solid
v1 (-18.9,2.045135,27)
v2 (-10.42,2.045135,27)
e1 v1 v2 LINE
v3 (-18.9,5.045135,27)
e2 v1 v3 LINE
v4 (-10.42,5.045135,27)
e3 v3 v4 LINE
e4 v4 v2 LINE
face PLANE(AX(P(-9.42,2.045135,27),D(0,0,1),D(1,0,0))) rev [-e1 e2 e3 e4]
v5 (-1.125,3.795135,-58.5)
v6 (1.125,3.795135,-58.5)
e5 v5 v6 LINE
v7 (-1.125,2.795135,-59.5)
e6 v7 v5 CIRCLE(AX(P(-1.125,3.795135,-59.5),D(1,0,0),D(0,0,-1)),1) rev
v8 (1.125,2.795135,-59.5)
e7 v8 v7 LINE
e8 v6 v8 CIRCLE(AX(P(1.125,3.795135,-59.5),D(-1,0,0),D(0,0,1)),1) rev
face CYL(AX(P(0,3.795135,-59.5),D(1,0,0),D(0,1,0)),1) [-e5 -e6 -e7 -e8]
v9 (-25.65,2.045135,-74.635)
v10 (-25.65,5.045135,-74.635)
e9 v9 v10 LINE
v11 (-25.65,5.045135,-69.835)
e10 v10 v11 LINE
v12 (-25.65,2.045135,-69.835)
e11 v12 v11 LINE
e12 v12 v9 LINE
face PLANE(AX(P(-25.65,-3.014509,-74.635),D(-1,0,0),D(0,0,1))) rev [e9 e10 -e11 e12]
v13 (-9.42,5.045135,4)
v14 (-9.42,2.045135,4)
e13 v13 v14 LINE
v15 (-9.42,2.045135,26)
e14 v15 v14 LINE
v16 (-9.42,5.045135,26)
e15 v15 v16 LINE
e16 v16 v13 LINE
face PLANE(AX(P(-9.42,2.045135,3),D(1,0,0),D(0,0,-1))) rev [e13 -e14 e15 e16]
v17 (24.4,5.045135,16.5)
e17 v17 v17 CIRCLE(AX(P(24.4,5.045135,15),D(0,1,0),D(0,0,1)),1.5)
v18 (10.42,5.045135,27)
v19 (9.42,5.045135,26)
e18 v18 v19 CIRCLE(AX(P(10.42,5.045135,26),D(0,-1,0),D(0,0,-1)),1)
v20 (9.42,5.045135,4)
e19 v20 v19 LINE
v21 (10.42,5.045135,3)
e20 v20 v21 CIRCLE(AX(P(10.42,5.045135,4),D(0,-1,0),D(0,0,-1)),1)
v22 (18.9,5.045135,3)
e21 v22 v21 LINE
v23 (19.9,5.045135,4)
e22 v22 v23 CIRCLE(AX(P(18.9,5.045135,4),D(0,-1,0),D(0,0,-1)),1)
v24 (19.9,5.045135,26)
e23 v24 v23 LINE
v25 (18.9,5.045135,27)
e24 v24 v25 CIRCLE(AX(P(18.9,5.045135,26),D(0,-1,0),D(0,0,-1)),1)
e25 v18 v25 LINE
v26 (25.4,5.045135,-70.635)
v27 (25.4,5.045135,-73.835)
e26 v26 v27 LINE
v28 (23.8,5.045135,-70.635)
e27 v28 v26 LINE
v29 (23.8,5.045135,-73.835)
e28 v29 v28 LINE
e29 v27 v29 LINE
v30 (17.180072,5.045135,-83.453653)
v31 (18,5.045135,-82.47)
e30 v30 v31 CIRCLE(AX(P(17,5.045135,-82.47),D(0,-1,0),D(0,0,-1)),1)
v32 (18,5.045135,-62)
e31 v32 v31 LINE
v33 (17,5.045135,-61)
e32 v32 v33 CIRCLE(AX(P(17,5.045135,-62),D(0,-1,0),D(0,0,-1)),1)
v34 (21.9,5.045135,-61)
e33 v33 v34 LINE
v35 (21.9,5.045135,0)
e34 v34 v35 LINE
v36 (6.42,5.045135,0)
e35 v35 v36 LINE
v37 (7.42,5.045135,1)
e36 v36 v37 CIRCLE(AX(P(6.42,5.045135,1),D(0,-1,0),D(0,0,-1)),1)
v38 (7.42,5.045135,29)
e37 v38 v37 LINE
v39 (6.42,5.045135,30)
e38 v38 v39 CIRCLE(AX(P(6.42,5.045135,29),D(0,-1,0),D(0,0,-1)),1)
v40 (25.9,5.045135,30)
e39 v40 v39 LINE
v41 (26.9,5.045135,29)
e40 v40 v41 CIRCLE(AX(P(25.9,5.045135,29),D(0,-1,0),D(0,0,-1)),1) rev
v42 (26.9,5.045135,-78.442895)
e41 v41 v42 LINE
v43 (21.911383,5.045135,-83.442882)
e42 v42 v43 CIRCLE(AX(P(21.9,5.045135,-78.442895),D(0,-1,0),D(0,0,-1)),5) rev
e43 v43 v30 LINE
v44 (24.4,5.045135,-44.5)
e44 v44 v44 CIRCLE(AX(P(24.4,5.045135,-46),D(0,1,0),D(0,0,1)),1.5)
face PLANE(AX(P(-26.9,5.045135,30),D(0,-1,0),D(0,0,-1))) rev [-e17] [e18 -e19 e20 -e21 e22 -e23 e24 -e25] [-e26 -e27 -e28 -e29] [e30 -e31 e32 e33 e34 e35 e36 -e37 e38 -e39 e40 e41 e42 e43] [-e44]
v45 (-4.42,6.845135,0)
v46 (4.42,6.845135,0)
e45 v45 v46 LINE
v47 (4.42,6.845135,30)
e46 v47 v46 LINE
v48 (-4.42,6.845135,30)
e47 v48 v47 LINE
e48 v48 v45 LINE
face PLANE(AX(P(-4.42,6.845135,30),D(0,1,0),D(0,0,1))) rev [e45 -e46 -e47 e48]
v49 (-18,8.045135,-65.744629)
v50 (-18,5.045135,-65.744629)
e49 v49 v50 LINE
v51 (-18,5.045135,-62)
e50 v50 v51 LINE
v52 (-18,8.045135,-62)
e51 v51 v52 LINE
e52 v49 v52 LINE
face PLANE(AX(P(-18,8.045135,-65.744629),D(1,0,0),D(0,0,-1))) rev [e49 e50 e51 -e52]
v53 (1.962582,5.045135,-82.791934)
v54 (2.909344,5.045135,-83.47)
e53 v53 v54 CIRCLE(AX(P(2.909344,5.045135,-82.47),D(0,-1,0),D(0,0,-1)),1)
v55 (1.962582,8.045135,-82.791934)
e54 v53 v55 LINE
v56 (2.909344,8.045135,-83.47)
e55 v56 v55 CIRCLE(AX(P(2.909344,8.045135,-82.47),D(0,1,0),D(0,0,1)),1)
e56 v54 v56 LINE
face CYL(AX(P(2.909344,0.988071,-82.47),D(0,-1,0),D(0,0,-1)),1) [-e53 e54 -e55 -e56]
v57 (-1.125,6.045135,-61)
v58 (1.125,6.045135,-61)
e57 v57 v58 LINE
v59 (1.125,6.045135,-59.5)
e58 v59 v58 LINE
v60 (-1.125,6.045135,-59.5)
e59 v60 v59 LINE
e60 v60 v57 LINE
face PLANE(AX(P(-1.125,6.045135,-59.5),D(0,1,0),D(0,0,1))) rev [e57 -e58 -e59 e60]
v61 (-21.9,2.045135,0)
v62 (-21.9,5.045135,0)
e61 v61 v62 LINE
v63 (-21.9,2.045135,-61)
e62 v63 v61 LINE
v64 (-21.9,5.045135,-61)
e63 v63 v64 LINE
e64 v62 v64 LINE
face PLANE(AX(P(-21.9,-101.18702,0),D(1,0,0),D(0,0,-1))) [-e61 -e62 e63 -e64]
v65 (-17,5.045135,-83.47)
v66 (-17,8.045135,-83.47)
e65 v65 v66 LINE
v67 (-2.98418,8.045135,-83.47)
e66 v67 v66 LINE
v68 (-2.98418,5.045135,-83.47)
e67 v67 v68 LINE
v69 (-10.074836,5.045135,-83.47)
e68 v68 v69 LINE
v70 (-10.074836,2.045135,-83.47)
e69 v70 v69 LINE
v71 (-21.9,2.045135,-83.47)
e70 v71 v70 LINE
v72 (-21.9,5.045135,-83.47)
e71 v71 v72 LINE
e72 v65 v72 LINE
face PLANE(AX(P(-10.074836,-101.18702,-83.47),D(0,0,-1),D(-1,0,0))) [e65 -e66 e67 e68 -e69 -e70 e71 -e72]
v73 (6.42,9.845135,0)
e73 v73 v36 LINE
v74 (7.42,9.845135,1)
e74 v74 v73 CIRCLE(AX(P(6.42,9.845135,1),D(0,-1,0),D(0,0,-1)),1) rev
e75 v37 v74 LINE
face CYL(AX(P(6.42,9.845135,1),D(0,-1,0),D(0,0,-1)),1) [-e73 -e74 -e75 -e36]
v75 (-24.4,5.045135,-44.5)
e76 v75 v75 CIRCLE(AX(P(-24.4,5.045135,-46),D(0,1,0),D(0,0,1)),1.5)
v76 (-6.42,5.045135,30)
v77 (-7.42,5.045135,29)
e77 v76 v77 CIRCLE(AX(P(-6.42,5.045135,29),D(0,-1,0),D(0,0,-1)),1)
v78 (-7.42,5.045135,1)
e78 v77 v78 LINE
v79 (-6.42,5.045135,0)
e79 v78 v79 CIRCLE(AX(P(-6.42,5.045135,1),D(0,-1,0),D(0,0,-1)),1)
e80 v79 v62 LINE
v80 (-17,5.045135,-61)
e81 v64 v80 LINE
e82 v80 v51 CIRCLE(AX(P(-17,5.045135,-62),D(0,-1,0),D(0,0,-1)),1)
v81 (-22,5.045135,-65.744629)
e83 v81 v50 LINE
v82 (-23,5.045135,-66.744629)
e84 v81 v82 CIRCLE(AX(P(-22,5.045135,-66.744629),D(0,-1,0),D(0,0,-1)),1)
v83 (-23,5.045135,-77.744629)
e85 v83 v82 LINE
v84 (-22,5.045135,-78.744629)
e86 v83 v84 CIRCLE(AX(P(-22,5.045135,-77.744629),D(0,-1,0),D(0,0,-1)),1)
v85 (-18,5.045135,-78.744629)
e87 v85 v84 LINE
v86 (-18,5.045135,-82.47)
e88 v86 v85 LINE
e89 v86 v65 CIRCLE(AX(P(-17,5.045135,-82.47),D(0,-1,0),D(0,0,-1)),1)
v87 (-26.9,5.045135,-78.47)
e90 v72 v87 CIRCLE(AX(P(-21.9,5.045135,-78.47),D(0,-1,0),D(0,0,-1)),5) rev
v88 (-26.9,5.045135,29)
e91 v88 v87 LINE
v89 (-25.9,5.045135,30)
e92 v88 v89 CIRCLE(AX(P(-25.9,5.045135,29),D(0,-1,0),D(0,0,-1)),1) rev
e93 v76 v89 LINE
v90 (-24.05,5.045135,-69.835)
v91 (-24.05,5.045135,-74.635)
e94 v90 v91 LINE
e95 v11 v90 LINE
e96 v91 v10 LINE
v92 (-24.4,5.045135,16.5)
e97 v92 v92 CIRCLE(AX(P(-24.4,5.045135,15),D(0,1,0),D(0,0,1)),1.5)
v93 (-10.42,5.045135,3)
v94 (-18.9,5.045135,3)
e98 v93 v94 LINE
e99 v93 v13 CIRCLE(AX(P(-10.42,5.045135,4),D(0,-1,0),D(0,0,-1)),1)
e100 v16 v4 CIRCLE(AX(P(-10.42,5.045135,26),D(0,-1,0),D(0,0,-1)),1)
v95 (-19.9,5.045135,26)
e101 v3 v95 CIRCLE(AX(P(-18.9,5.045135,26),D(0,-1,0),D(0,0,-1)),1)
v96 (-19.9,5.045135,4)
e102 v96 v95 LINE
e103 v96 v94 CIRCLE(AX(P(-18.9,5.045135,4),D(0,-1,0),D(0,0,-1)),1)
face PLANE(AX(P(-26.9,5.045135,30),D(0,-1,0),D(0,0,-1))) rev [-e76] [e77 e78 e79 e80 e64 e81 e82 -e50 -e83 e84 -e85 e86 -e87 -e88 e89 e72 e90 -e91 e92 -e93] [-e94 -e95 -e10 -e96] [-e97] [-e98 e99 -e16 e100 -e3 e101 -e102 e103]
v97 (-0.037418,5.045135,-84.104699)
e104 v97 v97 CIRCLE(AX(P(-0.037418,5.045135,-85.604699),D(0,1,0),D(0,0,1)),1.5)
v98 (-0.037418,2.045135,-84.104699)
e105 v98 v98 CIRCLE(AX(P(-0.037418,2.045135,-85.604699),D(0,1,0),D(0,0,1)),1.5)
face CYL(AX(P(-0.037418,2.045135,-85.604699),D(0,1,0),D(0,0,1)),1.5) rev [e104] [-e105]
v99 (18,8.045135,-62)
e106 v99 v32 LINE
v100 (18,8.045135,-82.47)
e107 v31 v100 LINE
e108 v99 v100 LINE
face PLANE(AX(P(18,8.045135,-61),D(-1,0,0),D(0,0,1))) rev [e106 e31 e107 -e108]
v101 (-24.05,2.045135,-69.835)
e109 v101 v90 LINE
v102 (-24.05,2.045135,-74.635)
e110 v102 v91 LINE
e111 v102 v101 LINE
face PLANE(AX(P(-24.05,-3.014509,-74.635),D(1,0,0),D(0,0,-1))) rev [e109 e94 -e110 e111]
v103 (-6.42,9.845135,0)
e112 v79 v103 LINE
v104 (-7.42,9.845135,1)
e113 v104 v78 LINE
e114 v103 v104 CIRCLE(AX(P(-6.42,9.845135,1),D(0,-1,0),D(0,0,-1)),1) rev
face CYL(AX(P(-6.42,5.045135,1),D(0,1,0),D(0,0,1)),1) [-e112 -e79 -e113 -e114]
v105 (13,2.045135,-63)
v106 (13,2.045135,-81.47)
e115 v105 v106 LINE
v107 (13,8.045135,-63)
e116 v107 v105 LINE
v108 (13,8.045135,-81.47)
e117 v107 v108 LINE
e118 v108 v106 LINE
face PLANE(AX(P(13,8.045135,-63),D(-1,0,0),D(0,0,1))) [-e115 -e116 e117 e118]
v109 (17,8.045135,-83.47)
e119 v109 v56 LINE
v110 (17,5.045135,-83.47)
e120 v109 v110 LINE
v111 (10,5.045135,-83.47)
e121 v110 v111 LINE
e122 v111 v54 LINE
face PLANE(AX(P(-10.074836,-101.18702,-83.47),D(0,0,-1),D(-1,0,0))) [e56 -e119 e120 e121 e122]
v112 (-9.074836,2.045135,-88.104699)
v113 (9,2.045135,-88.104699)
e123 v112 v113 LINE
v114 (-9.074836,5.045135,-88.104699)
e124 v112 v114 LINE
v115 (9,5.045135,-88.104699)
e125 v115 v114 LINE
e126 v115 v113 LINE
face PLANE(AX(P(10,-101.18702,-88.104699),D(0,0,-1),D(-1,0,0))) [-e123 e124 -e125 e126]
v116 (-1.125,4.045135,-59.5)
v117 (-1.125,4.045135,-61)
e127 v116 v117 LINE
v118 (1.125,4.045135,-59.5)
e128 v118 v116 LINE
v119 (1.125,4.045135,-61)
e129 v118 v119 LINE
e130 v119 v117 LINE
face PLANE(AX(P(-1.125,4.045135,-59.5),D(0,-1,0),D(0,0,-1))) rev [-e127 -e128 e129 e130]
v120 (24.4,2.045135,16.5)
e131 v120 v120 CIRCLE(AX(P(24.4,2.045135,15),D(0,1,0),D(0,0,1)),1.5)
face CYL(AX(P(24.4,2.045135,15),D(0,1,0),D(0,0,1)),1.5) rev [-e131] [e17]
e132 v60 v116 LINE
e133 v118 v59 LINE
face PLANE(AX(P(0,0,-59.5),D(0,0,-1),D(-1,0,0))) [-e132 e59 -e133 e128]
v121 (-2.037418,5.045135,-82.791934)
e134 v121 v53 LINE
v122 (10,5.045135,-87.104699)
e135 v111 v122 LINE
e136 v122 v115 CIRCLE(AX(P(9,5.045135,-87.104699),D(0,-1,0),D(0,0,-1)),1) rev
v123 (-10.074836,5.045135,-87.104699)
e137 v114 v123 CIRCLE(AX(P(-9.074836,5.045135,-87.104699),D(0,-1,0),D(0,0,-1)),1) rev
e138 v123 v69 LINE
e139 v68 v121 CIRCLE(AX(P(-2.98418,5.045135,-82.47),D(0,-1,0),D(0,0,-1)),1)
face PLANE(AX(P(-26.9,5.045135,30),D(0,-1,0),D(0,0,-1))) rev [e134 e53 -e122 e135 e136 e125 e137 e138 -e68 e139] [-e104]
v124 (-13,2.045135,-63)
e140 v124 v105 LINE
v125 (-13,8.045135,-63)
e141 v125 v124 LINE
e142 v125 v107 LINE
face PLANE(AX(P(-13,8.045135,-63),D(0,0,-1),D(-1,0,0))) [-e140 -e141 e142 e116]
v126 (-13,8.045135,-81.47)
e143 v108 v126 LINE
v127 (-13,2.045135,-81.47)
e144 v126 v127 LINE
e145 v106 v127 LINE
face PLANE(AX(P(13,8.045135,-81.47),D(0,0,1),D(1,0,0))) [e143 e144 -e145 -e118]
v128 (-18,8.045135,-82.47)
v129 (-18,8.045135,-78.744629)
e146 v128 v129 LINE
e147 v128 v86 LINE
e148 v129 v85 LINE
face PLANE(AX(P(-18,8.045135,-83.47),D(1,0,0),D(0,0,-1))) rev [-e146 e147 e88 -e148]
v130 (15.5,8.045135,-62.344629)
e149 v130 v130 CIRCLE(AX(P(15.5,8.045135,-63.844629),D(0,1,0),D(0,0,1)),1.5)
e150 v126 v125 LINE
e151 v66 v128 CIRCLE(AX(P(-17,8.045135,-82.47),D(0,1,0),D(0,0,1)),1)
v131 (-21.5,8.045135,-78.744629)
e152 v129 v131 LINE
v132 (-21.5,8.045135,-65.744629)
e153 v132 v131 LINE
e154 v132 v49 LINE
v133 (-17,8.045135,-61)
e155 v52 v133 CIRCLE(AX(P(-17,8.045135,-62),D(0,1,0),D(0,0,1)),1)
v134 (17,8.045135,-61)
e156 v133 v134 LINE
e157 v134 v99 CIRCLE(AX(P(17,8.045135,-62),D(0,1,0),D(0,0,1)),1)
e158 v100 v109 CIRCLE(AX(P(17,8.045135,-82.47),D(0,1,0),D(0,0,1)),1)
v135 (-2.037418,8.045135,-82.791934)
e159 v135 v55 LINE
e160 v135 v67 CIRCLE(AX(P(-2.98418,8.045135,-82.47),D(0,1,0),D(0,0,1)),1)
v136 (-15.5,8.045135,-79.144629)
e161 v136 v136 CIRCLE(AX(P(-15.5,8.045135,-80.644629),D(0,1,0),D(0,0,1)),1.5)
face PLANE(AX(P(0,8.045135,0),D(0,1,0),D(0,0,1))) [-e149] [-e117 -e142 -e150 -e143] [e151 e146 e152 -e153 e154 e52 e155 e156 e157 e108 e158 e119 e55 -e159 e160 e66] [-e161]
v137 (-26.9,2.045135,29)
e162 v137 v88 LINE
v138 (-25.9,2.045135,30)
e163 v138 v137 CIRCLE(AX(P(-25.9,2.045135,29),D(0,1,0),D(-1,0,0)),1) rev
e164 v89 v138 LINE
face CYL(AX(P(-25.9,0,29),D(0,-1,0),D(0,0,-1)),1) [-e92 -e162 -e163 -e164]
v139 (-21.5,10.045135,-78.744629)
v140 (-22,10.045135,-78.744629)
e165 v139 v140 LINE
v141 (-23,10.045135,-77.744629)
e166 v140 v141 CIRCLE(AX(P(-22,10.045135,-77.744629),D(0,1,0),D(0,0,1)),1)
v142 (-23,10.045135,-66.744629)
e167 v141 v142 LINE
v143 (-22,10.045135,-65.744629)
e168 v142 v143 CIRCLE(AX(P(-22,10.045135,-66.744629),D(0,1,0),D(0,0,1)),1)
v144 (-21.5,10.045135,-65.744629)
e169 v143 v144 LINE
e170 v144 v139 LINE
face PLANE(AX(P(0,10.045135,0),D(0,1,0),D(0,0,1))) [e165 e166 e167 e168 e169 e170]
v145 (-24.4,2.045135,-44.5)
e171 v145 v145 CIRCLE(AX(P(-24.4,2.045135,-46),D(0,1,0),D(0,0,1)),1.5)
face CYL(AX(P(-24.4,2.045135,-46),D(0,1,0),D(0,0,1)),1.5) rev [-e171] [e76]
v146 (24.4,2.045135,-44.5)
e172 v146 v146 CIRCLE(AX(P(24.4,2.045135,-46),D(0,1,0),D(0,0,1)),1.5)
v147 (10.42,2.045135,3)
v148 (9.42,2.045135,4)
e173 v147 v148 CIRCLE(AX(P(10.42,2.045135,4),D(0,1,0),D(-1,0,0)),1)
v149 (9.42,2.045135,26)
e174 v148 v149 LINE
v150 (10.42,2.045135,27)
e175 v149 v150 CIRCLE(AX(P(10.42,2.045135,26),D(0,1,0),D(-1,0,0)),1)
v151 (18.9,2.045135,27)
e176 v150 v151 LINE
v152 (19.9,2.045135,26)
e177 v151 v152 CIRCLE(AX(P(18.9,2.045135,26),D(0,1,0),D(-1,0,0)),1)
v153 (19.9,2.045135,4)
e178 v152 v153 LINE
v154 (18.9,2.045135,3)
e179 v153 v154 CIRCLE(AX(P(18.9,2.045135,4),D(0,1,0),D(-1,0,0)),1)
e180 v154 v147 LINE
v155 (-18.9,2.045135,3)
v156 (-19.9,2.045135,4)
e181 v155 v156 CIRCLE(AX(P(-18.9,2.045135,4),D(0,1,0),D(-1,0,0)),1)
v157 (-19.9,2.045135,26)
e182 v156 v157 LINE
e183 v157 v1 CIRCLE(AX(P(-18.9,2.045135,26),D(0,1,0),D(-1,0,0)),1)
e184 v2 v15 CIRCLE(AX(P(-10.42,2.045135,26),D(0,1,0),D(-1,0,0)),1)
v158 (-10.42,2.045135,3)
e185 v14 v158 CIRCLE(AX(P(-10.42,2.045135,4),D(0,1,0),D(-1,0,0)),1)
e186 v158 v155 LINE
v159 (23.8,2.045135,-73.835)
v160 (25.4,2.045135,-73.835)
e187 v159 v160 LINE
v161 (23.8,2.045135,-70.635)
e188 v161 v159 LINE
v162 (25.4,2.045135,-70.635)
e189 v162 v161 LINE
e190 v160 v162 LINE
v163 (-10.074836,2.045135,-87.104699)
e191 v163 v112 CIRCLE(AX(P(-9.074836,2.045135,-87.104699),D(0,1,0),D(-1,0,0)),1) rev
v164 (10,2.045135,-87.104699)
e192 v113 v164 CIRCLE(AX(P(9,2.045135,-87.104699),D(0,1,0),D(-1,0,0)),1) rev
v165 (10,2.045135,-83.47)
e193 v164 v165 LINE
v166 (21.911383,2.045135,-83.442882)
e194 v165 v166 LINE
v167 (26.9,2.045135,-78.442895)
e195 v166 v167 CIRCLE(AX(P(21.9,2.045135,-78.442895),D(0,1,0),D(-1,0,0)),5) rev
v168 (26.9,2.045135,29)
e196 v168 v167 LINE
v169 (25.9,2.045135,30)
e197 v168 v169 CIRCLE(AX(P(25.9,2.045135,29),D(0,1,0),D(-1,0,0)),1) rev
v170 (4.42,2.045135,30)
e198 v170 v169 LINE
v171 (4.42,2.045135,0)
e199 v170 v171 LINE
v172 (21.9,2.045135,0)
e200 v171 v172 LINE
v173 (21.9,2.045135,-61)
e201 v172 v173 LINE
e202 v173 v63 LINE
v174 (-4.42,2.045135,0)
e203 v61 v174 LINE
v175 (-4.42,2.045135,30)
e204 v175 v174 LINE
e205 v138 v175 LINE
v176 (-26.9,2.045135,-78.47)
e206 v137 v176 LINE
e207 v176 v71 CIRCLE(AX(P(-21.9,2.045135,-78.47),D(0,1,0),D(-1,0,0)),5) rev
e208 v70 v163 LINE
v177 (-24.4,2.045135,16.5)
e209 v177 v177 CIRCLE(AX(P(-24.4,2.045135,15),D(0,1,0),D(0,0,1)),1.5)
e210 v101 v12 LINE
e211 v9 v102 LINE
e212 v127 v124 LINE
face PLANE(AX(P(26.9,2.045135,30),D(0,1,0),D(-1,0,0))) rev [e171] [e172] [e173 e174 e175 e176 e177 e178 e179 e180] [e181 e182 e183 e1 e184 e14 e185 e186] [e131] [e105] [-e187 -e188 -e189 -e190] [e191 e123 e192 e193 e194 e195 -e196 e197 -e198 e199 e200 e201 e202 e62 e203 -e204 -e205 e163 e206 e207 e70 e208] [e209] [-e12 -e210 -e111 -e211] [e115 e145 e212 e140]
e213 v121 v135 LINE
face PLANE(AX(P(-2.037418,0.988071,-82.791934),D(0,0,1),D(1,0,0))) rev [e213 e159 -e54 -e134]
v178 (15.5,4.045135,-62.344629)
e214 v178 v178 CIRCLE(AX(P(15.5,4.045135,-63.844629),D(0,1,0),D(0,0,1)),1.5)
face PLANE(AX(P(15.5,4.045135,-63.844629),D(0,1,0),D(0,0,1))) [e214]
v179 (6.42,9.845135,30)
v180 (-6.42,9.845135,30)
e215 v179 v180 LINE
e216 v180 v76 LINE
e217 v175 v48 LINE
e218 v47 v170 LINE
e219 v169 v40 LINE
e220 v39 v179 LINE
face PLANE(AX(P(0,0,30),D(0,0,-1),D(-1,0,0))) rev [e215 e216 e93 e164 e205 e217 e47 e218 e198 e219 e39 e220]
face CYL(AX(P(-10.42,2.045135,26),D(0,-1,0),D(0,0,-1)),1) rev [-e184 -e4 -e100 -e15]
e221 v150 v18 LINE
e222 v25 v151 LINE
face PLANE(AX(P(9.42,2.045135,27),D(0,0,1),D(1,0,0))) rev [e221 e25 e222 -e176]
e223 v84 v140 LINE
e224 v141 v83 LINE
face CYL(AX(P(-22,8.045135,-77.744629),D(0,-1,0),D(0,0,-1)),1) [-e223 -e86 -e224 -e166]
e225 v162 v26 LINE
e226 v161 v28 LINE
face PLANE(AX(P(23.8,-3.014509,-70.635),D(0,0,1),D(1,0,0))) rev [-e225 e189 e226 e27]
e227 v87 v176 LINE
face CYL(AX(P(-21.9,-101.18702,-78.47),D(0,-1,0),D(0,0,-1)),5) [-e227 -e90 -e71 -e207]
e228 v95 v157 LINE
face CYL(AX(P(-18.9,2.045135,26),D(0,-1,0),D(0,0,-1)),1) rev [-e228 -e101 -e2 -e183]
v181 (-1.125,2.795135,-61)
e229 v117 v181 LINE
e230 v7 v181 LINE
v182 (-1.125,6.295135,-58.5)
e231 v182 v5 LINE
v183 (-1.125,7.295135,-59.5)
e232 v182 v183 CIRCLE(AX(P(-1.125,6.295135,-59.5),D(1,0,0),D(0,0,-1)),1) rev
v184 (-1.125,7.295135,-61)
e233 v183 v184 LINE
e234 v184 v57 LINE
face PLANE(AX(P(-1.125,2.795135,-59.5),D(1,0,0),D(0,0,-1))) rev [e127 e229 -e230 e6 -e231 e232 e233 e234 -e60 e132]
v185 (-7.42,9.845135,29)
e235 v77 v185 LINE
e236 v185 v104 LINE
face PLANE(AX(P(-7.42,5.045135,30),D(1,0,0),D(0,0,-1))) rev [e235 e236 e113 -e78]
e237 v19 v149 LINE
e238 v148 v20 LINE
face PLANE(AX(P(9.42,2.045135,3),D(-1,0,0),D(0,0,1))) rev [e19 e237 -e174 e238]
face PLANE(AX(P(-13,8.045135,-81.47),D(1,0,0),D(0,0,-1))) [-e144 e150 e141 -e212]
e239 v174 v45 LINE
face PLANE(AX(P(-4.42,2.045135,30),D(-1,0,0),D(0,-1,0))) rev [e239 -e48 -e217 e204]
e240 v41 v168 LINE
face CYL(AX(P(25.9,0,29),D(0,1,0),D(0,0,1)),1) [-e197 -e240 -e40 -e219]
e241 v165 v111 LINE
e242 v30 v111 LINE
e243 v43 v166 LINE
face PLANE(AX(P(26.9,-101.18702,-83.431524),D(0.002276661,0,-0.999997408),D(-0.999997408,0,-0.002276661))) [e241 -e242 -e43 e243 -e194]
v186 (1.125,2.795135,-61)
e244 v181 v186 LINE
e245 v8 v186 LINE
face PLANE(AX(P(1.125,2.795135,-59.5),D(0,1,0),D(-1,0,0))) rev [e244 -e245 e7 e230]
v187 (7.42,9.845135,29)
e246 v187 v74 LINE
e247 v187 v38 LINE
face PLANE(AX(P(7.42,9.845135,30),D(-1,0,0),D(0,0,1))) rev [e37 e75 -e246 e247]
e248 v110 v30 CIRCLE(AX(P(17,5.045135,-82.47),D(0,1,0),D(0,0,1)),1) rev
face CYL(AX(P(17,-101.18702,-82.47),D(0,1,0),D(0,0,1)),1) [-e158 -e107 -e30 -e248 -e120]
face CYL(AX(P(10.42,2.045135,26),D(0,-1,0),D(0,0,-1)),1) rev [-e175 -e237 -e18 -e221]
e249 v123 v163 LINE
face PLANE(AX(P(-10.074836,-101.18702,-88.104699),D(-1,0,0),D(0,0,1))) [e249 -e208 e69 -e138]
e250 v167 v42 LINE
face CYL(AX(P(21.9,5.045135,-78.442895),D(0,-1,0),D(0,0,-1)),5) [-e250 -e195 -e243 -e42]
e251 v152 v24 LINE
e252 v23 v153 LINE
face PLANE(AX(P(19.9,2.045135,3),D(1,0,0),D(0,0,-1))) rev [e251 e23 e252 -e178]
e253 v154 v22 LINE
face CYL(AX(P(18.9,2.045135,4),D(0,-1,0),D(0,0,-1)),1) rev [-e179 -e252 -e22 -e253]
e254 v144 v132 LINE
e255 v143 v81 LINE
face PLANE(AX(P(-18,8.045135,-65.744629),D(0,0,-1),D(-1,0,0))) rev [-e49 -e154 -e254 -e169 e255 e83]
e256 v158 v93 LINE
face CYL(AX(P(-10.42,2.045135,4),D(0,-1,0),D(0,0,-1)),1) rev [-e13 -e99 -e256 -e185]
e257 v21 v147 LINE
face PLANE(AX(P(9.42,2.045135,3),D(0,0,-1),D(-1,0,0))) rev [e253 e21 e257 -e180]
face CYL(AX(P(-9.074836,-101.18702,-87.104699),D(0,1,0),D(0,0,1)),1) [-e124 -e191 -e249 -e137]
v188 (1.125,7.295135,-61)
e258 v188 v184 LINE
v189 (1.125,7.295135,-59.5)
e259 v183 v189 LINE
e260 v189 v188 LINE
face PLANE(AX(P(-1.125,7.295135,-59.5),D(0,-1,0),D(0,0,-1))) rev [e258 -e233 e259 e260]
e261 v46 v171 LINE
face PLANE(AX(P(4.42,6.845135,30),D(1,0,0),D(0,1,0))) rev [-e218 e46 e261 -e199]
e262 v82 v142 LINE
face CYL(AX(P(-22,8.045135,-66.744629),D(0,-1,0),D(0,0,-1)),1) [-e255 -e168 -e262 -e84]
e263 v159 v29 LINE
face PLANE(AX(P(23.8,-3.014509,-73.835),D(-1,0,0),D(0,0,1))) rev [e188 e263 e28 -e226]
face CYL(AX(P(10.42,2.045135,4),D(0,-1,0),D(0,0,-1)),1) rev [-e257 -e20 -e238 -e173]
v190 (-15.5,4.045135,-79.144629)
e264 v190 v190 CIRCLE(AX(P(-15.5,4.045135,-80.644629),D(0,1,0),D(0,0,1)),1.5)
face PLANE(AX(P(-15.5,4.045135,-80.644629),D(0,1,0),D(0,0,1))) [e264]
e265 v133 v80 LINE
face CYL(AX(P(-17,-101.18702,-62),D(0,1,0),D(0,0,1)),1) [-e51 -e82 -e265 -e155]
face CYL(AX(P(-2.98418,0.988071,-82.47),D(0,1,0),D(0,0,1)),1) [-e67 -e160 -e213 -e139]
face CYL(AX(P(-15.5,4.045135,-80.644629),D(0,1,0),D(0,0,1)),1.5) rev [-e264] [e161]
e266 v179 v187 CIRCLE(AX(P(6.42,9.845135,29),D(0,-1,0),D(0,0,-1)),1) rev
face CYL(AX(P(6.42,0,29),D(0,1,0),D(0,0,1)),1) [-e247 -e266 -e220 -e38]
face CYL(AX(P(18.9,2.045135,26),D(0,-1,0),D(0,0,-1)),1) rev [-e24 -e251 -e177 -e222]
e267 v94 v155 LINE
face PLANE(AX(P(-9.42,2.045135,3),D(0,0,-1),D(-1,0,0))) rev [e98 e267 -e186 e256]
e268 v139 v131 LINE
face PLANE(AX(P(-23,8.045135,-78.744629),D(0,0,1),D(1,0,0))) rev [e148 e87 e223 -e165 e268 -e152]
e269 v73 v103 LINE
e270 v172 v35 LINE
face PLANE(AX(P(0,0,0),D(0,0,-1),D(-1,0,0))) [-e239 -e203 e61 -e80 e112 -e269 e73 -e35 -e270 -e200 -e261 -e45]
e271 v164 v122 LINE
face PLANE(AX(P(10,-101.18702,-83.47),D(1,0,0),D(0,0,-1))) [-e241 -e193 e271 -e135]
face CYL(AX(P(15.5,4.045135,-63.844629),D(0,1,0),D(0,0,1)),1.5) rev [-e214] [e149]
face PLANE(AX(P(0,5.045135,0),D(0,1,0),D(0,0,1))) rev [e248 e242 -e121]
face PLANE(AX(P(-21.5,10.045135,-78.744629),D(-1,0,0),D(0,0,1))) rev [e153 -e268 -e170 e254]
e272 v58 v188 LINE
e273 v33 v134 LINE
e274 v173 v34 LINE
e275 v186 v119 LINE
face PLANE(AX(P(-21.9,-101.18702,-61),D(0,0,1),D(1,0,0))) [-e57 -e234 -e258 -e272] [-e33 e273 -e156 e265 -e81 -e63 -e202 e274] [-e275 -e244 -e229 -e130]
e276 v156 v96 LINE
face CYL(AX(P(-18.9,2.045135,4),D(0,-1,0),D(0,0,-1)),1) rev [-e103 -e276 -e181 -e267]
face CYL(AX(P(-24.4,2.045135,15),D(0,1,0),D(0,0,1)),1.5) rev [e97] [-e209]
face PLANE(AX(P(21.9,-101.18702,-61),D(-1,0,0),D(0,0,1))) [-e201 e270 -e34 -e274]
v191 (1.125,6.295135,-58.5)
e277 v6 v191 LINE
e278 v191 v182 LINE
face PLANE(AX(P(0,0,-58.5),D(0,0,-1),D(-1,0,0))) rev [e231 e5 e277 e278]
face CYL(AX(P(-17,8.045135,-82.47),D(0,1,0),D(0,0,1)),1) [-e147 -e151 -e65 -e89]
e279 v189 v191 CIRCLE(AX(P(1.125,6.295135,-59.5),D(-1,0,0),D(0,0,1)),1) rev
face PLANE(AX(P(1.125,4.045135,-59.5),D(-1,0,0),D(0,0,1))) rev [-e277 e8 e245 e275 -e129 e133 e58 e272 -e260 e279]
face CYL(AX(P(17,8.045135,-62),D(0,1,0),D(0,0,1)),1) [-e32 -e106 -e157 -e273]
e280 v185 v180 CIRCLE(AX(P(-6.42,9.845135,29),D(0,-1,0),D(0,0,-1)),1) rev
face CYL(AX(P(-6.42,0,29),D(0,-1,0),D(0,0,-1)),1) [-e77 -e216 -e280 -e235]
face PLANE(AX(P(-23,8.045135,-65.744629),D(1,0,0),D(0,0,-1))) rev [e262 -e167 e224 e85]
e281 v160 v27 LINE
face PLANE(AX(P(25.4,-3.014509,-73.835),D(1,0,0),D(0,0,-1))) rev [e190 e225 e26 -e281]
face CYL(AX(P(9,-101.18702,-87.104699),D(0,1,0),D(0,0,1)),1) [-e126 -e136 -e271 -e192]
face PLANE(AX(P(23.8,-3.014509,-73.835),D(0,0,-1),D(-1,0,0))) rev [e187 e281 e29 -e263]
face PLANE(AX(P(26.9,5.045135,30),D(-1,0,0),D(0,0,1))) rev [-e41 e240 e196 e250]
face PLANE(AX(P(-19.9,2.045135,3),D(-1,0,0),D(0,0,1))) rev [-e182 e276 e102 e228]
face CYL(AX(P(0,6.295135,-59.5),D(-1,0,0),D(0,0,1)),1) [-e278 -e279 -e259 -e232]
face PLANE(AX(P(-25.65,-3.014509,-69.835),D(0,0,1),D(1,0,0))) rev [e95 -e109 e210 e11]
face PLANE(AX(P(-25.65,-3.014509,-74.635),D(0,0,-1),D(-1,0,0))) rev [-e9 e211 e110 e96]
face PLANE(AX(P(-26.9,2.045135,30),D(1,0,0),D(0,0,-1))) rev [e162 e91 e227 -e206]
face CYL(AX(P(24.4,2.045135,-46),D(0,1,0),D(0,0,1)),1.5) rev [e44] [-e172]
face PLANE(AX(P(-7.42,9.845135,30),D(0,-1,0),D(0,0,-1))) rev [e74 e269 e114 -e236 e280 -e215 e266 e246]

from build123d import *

# Parameters (mm, degrees)
BOSS_EXTRUDE1_DEPTH = 30
BOSS_EXTRUDE2_DEPTH = 3
SKETCH4_W           = 10.48
SKETCH4_H           = 24
CUT_EXTRUDE1_DEPTH  = 93.244717637
SKETCH5_R           = 1.5
CUT_EXTRUDE2_DEPTH  = 93.244717637
FILLET1_R           = 1
SKETCH7_W           = 26
SKETCH7_H           = 18.47
BOSS_EXTRUDE3_DEPTH = 3
SKETCH8_R           = 1.5
CUT_EXTRUDE3_DEPTH  = 4
SKETCH9_W           = 1.5
SKETCH9_H           = 13
BOSS_EXTRUDE4_DEPTH = 2
SKETCH10_W          = 26
SKETCH10_H          = 18.47
CUT_EXTRUDE4_DEPTH  = 3
SKETCH11_W          = 4
SKETCH11_H          = 0.67806633
CUT_EXTRUDE5_DEPTH  = 3
FILLET2_R           = 1
FILLET3_R           = 5
SKETCH12_W          = 1.6
SKETCH12_H          = 3.2
SKETCH12_H_2        = 4.8
CUT_EXTRUDE6_DEPTH  = 3
SKETCH13_W          = 2.25
SKETCH13_H          = 1.25
BOSS_EXTRUDE5_DEPTH = 1.5
SKETCH14_W          = 2.25
SKETCH14_H          = 4.5
BOSS_EXTRUDE6_DEPTH = 1
FILLET4_R           = 1


with BuildPart() as part:
    # Sketch1 → Boss-Extrude1 (new body)
    with BuildSketch(Plane.XY):
        Polygon((-26.9, 2.045135231), (-26.9, 5.045135231), (-7.42, 5.045135231), (-7.42, 9.845135231), (7.42, 9.845135231), (7.42, 5.045135231), (26.9, 5.045135231), (26.9, 2.045135231), (4.42, 2.045135231), (4.42, 6.845135231), (-4.42, 6.845135231), (-4.42, 2.045135231), align=None)
    extrude(amount=BOSS_EXTRUDE1_DEPTH)

    # Sketch3 → Boss-Extrude2 (add)
    with BuildSketch(Plane(origin=(0, 5.045135231, 0), x_dir=(1, 0, 0), z_dir=(0, 1, 0))):
        Polygon((26.9, 0), (26.9, 83.431524331), (10, 83.47), (10, 88.104698694), (-10.074836098, 88.104698694), (-10.074836098, 83.47), (-26.9, 83.47), (-26.9, 0), (-21.9, 0), (-21.9, 61), (21.9, 61), (21.9, 0), align=None)
    extrude(amount=-BOSS_EXTRUDE2_DEPTH)

    # Sketch4 → Cut-Extrude1 (cut, through all)
    with BuildSketch(Plane(origin=(0, 5.045135231, 0), x_dir=(1, 0, 0), z_dir=(0, 1, 0))):
        with Locations((14.66, -15)):
            Rectangle(SKETCH4_W, SKETCH4_H)
        with Locations((-14.66, -15)):
            Rectangle(SKETCH4_W, SKETCH4_H)
    extrude(amount=-CUT_EXTRUDE1_DEPTH, mode=Mode.SUBTRACT)

    # Sketch5 → Cut-Extrude2 (cut, through all)
    with BuildSketch(Plane(origin=(0, 5.045135231, 0), x_dir=(1, 0, 0), z_dir=(0, 1, 0))):
        with Locations(Location((24.4, -15, 0), (0, 0, 270))):
            Circle(SKETCH5_R)
        with Locations(Location((-24.4, -15, 0), (0, 0, 270))):
            Circle(SKETCH5_R)
        with Locations(Location((-0.037418049, 85.604698694, 0), (0, 0, 270))):
            Circle(SKETCH5_R)
        with Locations(Location((24.4, 46, 0), (0, 0, 270))):
            Circle(SKETCH5_R)
        with Locations(Location((-24.4, 46, 0), (0, 0, 270))):
            Circle(SKETCH5_R)
    extrude(amount=-CUT_EXTRUDE2_DEPTH, mode=Mode.SUBTRACT)

    # Fillet1
    fillet1_edges = [part.edges().sort_by_distance(p)[0] for p in [
        (-7.42, 7.445135231, 0),
        (7.42, 7.445135231, 0),
        (26.9, 3.545135231, 30),
        (7.42, 7.445135231, 30),
        (-10.074836098, 3.545135231, -88.104698694),
        (10, 3.545135231, -88.104698694),
        (-7.42, 7.445135231, 30),
        (-26.9, 3.545135231, 30),
        (9.42, 3.545135231, 27),
        (9.42, 3.545135231, 3),
        (19.9, 3.545135231, 3),
        (19.9, 3.545135231, 27),
        (-19.9, 3.545135231, 3),
        (-9.42, 3.545135231, 3),
        (-9.42, 3.545135231, 27),
        (-19.9, 3.545135231, 27),
    ]]
    fillet(fillet1_edges, radius=FILLET1_R)

    # Sketch7 → Boss-Extrude3 (add)
    with BuildSketch(Plane(origin=(0, 5.045135231, 0), x_dir=(1, 0, 0), z_dir=(0, 1, 0))):
        Polygon((-18, 83.47), (-18, 78.74462915), (-23, 78.74462915), (-23, 65.74462915), (-18, 65.74462915), (-18, 61), (18, 61), (18, 83.47), align=None)
        with Locations((0, 72.235)):
            Rectangle(SKETCH7_W, SKETCH7_H, mode=Mode.SUBTRACT)
    extrude(amount=BOSS_EXTRUDE3_DEPTH)

    # Sketch8 → Cut-Extrude3 (cut)
    with BuildSketch(Plane(origin=(0, 8.045135231, 0), x_dir=(1, 0, 0), z_dir=(0, 1, 0))):
        with Locations(Location((-15.5, 80.64462915, 0), (0, 0, 270))):
            Circle(SKETCH8_R)
        with Locations(Location((15.5, 63.84462915, 0), (0, 0, 270))):
            Circle(SKETCH8_R)
    extrude(amount=-CUT_EXTRUDE3_DEPTH, mode=Mode.SUBTRACT)

    # Sketch9 → Boss-Extrude4 (add)
    with BuildSketch(Plane(origin=(0, 8.045135231, 0), x_dir=(1, 0, 0), z_dir=(0, 1, 0))):
        with Locations((-22.25, 72.24462915)):
            Rectangle(SKETCH9_W, SKETCH9_H)
    extrude(amount=BOSS_EXTRUDE4_DEPTH)

    # Sketch10 → Cut-Extrude4 (cut)
    with BuildSketch(Plane(origin=(0, 5.045135231, 0), x_dir=(1, 0, 0), z_dir=(0, 1, 0))):
        with Locations((0, 72.235)):
            Rectangle(SKETCH10_W, SKETCH10_H)
    extrude(amount=-CUT_EXTRUDE4_DEPTH, mode=Mode.SUBTRACT)

    # Sketch11 → Cut-Extrude5 (cut)
    with BuildSketch(Plane(origin=(0, 8.045135231, 0), x_dir=(1, 0, 0), z_dir=(0, 1, 0))):
        with Locations((-0.037418049, 83.130966835)):
            Rectangle(SKETCH11_W, SKETCH11_H)
    extrude(amount=-CUT_EXTRUDE5_DEPTH, mode=Mode.SUBTRACT)

    # Fillet2
    # the kernel refuses this fillet: 1 mm, written as the material it takes off along each edge
    with BuildSketch(Plane(origin=(18, 5.045135231, -83.47), x_dir=(0, 0, 1), z_dir=(0, 1, 0)), Plane(origin=(-18, 5.045135231, -83.47), x_dir=(1, 0, 0), z_dir=(0, 1, 0)), Plane(origin=(-18, 5.045135231, -61), x_dir=(0, 0, -1), z_dir=(0, 1, 0)), Plane(origin=(18, 5.045135231, -61), x_dir=(-1, 0, 0), z_dir=(0, 1, 0))) as fillet2_piece_1:
        with BuildLine():
            CenterArc((FILLET2_R, -FILLET2_R), FILLET2_R, 90, 90)
            Line((0, -FILLET2_R), (-FILLET2_R * 0.02, -FILLET2_R))
            Line((-FILLET2_R * 0.02, -FILLET2_R), (-FILLET2_R * 0.02, FILLET2_R * 0.02))
            Line((-FILLET2_R * 0.02, FILLET2_R * 0.02), (FILLET2_R, FILLET2_R * 0.02))
            Line((FILLET2_R, FILLET2_R * 0.02), (FILLET2_R, 0))
        make_face()
    extrude(amount=5.5, mode=Mode.SUBTRACT)
    with BuildSketch(Plane(origin=(-23, 5.045135231, -78.74462915), x_dir=(1, 0, 0), z_dir=(0, 1, 0)), Plane(origin=(-23, 5.045135231, -65.74462915), x_dir=(0, 0, -1), z_dir=(0, 1, 0))) as fillet2_piece_2:
        with BuildLine():
            CenterArc((FILLET2_R, -FILLET2_R), FILLET2_R, 90, 90)
            Line((0, -FILLET2_R), (-FILLET2_R * 0.02, -FILLET2_R))
            Line((-FILLET2_R * 0.02, -FILLET2_R), (-FILLET2_R * 0.02, FILLET2_R * 0.02))
            Line((-FILLET2_R * 0.02, FILLET2_R * 0.02), (FILLET2_R, FILLET2_R * 0.02))
            Line((FILLET2_R, FILLET2_R * 0.02), (FILLET2_R, 0))
        make_face()
    extrude(amount=7.5, mode=Mode.SUBTRACT)
    with BuildSketch(Plane(origin=(1.962581951, 10.412040795, -83.47), x_dir=(1, 0, 0), z_dir=(0, -1, 0))) as fillet2_piece_3:
        with BuildLine():
            CenterArc((0.946762226, 1), FILLET2_R, 198.779905416, 71.220094584)
            Line((0, 0.67806633), (-0.018935245, 0.671627657))
            ThreePointArc((-0.018935245, 0.671627657), (-0.02, 0.339033165), (-0.02, 0))
            Line((-0.02, 0), (0, -0.02))
            Line((0, -0.02), (0.946762226, -0.02))
            Line((0.946762226, -0.02), (0.946762226, 0))
        make_face()
    extrude(amount=5.366905565, mode=Mode.SUBTRACT)
    with BuildSketch(Plane(origin=(-2.037418049, 10.412040795, -83.47), x_dir=(-1, 0, 0), z_dir=(0, -1, 0))) as fillet2_piece_4:
        with BuildLine():
            CenterArc((0.946762226, -1), FILLET2_R, 90, 71.220094584)
            Line((0, -0.67806633), (-0.018935245, -0.671627657))
            ThreePointArc((-0.018935245, -0.671627657), (-0.02, -0.339033165), (-0.02, 0))
            Line((-0.02, 0), (0, 0.02))
            Line((0, 0.02), (0.946762226, 0.02))
            Line((0.946762226, 0.02), (0.946762226, 0))
        make_face()
    extrude(amount=5.366905565, mode=Mode.SUBTRACT)

    # Fillet3
    fillet3_edges = [part.edges().sort_by_distance(p)[0] for p in [
        (-26.9, 3.545135231, -83.47),
        (26.9, 3.545135231, -83.431524331),
    ]]
    fillet(fillet3_edges, radius=FILLET3_R)

    # Sketch12 → Cut-Extrude6 (cut)
    with BuildSketch(Plane(origin=(0, 5.045135231, 0), x_dir=(1, 0, 0), z_dir=(0, 1, 0))):
        with Locations((24.6, 72.235)):
            Rectangle(SKETCH12_W, SKETCH12_H)
        with Locations((-24.85, 72.235)):
            Rectangle(SKETCH12_W, SKETCH12_H_2)
    extrude(amount=-CUT_EXTRUDE6_DEPTH, mode=Mode.SUBTRACT)

    # Sketch13 → Boss-Extrude5 (add)
    with BuildSketch(Plane.XY.offset(-61)):
        with Locations((0, 6.670135231)):
            Rectangle(SKETCH13_W, SKETCH13_H)
        with Locations((0, 3.420135231)):
            Rectangle(SKETCH13_W, SKETCH13_H)
    extrude(amount=BOSS_EXTRUDE5_DEPTH)

    # Sketch14 → Boss-Extrude6 (add)
    with BuildSketch(Plane.XY.offset(-59.5)):
        with Locations((0, 5.045135231)):
            Rectangle(SKETCH14_W, SKETCH14_H)
    extrude(amount=BOSS_EXTRUDE6_DEPTH)

    # Fillet4
    fillet4_edges = [part.edges().sort_by_distance(p)[0] for p in [
        (0, 2.795135231, -58.5),
        (0, 7.295135231, -58.5),
    ]]
    fillet(fillet4_edges, radius=FILLET4_R)


solid = part.part
